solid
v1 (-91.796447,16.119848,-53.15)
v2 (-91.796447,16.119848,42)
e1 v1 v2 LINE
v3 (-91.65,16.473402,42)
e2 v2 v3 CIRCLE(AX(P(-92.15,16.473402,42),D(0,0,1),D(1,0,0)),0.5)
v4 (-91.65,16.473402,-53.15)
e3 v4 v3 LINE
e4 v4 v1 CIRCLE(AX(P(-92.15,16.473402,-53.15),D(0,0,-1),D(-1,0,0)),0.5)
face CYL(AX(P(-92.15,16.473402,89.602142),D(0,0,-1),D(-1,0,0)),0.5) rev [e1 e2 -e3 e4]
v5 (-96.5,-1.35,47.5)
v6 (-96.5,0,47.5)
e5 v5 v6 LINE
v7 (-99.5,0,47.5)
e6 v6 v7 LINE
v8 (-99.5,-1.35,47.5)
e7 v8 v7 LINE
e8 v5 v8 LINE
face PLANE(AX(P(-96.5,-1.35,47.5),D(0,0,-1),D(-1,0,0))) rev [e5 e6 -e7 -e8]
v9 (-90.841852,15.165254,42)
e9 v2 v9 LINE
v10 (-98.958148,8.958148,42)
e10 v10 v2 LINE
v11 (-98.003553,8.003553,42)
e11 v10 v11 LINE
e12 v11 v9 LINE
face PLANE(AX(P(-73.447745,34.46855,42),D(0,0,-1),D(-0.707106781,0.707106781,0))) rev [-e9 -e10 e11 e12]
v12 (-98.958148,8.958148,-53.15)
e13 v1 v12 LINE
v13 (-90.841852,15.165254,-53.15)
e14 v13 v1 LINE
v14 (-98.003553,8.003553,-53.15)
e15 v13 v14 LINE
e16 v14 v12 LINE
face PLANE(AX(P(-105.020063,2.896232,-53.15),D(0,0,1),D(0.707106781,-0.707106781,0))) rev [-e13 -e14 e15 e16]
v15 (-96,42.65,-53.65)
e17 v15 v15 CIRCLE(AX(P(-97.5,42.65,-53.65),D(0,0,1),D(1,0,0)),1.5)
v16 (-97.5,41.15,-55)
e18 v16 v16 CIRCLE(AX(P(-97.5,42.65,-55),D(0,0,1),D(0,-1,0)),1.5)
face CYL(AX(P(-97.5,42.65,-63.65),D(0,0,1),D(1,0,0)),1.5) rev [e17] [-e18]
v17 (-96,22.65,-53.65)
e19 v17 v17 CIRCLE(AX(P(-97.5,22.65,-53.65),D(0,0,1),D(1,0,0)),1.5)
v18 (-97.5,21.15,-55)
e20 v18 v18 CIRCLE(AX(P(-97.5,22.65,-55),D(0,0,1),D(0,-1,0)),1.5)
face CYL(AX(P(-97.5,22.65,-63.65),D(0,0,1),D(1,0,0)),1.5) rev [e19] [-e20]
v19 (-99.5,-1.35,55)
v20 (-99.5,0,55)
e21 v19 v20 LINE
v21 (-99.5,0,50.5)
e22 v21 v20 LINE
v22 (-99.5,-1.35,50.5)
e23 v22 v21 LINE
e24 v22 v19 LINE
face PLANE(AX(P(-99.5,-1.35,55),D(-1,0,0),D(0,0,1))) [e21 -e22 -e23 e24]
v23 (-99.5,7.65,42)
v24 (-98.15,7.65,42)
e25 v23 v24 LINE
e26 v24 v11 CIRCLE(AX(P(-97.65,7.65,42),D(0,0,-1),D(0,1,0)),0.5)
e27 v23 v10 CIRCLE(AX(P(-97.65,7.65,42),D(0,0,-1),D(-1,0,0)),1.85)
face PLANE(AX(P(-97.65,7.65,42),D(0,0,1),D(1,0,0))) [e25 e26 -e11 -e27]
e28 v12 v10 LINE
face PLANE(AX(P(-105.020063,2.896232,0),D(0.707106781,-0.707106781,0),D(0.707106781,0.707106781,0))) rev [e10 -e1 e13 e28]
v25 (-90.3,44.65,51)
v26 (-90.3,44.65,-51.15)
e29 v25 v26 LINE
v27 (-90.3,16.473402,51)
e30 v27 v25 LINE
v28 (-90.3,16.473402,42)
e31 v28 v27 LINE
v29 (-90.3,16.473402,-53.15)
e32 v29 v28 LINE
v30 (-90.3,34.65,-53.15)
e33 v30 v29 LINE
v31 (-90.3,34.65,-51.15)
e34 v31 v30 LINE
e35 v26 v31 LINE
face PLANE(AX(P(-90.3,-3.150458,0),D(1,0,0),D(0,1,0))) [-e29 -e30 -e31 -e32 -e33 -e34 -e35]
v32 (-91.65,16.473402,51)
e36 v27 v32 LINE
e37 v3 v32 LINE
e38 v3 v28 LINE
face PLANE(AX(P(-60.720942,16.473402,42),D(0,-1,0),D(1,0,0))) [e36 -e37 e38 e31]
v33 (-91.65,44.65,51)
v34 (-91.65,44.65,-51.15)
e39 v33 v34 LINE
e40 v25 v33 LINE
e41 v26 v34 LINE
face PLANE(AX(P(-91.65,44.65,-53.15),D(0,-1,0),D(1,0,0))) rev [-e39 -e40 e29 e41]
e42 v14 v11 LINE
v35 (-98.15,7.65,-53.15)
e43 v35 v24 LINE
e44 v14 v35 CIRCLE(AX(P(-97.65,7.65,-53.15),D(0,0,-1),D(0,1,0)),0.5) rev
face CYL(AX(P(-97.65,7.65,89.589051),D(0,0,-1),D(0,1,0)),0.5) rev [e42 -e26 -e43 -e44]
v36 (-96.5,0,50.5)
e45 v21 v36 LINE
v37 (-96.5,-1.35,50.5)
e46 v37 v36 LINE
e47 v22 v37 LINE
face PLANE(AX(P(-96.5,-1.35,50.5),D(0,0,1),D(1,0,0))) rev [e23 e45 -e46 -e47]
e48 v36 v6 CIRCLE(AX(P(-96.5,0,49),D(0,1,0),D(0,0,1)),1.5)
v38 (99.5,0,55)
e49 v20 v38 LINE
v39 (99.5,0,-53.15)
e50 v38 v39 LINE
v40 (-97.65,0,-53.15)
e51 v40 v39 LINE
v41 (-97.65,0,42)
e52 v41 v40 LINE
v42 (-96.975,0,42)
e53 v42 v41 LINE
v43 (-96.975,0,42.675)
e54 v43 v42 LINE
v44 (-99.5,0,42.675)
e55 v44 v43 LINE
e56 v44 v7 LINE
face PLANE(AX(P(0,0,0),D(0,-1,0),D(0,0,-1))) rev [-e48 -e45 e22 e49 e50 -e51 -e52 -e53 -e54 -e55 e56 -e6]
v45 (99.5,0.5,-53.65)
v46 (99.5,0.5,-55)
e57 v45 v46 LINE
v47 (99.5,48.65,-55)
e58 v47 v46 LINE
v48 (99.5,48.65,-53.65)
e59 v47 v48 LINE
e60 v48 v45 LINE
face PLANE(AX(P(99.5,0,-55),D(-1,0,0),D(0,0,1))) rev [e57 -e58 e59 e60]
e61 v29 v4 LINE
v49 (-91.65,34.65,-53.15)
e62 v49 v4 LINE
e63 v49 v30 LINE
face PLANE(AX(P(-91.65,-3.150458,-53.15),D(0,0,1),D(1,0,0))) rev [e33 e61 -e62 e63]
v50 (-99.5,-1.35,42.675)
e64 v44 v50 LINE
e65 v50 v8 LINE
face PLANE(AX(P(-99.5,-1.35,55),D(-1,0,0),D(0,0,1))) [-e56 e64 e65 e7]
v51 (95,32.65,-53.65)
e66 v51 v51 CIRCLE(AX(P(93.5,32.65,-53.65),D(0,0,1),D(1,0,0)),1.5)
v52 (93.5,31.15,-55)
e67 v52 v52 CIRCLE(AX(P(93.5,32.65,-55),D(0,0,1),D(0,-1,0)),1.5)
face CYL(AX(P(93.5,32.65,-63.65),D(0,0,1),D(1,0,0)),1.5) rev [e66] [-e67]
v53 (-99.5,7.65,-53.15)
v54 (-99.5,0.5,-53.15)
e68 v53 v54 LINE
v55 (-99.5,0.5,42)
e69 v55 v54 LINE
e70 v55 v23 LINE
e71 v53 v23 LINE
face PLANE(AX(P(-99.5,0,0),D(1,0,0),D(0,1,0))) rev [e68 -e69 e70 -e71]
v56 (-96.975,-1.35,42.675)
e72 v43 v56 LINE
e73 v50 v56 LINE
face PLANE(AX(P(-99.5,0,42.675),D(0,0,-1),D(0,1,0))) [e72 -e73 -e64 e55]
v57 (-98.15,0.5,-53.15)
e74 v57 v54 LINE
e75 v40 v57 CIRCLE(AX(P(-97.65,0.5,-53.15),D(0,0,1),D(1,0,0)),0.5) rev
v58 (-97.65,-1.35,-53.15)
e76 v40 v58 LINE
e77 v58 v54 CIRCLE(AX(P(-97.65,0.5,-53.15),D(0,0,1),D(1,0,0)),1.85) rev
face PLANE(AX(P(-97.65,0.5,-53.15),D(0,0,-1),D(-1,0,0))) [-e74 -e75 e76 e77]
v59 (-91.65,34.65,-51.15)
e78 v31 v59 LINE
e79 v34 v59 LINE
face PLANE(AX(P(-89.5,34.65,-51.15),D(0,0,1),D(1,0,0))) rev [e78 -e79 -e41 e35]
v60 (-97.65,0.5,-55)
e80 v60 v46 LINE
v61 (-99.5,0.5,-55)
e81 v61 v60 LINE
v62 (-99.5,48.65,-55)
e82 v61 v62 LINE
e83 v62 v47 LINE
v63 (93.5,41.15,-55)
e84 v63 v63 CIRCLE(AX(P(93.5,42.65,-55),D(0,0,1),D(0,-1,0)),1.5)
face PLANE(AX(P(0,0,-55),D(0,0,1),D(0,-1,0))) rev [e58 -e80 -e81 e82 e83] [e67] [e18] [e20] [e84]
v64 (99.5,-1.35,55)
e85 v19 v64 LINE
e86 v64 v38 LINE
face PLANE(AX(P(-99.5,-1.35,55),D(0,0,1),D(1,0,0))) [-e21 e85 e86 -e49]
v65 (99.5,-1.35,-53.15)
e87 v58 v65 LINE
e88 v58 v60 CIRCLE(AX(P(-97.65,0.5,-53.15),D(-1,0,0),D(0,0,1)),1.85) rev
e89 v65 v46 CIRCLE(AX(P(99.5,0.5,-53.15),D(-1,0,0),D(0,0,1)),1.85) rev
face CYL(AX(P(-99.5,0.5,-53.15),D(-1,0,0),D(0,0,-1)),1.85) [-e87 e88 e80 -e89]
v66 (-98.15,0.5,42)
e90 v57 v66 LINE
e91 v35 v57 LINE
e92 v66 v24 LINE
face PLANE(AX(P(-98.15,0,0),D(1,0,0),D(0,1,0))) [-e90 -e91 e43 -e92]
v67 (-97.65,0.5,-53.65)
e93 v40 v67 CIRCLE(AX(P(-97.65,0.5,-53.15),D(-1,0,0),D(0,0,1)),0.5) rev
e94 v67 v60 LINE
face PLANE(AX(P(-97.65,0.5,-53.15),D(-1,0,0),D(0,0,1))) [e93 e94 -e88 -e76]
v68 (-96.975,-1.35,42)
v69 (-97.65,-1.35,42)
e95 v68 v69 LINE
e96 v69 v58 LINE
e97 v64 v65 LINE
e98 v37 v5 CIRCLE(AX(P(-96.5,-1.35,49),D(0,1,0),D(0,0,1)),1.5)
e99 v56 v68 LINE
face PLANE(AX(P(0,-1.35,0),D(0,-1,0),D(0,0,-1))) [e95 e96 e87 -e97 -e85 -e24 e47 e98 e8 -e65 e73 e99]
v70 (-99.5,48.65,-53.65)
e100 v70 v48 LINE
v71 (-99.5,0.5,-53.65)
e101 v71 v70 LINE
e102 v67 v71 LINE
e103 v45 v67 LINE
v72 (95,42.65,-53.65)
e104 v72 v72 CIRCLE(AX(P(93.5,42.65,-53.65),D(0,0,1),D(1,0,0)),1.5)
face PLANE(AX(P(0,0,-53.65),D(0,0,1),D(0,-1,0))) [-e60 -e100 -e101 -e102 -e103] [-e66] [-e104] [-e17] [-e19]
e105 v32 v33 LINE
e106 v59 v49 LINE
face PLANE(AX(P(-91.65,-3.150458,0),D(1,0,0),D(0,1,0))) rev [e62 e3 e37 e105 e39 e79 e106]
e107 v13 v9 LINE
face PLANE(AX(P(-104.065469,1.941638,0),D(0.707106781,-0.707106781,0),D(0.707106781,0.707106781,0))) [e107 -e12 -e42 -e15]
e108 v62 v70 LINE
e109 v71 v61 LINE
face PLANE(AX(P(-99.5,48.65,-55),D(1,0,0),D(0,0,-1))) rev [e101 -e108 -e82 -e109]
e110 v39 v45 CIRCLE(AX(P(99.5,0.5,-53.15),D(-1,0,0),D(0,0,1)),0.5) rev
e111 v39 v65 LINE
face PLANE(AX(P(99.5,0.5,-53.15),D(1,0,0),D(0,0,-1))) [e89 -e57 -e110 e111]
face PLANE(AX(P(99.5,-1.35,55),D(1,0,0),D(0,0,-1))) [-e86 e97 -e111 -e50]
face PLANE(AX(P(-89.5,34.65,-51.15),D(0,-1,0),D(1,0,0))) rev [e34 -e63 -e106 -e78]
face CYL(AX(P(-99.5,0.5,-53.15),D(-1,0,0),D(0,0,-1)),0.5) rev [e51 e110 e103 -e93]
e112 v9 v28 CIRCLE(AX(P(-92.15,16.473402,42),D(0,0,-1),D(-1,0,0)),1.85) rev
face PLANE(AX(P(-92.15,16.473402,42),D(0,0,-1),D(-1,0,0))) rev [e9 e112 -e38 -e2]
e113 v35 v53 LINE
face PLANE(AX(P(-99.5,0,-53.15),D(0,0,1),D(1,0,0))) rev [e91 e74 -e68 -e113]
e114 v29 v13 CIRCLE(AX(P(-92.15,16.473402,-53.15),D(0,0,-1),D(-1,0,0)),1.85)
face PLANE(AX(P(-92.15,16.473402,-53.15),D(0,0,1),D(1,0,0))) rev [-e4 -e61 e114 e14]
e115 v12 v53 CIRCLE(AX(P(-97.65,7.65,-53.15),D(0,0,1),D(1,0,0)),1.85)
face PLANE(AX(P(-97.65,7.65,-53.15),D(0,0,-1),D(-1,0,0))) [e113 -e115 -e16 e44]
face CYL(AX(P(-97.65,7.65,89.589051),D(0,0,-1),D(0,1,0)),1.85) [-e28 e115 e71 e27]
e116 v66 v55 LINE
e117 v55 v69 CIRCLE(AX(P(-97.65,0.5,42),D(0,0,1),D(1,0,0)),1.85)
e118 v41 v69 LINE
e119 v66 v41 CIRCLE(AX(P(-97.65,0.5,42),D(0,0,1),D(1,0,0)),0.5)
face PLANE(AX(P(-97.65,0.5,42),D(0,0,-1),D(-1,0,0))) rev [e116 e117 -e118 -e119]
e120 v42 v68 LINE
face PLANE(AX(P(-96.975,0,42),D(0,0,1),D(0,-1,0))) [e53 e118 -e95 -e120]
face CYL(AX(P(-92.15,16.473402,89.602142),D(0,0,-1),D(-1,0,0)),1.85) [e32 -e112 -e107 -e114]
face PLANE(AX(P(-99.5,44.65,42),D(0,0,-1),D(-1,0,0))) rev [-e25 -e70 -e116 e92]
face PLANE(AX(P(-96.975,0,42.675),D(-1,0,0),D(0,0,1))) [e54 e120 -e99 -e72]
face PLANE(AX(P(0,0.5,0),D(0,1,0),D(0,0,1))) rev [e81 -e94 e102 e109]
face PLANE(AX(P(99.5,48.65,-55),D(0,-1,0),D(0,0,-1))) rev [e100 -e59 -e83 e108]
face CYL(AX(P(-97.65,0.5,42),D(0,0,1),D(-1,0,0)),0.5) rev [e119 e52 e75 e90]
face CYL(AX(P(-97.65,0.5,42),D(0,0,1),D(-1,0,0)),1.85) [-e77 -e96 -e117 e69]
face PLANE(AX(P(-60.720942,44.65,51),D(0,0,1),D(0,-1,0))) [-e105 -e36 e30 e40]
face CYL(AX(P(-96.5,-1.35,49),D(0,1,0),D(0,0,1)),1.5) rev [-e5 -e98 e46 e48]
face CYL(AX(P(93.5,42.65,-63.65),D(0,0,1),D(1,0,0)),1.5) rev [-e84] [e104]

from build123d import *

# Parameters (mm, degrees)
SKETCH1_W                    = 199
SKETCH1_H                    = 110
BASE_FLANGE1_DEPTH           = 1.35
EDGE_FLANGE1_STRIP_W         = 6.4
EDGE_FLANGE1_STRIP_H         = 1.35
EDGE_FLANGE1_STRIP_CUT_DEPTH = 199
EDGE_FLANGE1_DEPTH           = 199
EDGE_FLANGE2_START           = -55
EDGE_FLANGE2_DEPTH           = 97.675
EDGE_FLANGE2_2_DEPTH         = 1.85
EDGE_FLANGE2_START_2         = 42
EDGE_FLANGE2_3_DEPTH         = 0.675
EDGE_FLANGE2_START_3         = -53.15
EDGE_FLANGE2_4_DEPTH         = 95.15
JOG1_START                   = -53.15
JOG1_DEPTH                   = 95.15
JOG1_2_DEPTH                 = 95.15
SKETCH13_W                   = 2
SKETCH13_H                   = 10
CUT_EXTRUDE1_DEPTH           = 10
SKETCH15_R                   = 1.5
CUT_EXTRUDE2_DEPTH           = 10
SKETCH31_W                   = 9
SKETCH31_H                   = 28.176598128
BOSS_EXTRUDE2_DEPTH          = 1.35
CUT_EXTRUDE3_DEPTH           = 124.661119597


# Read off the part's stored shape, not the designer's step: Edge-Flange2, Jog1
# Sheet-metal steps are written as plain solids
with BuildPart() as part:
    # Sketch1 → Base-Flange1 (new body)
    with BuildSketch(Plane(origin=(0, 0, 0), x_dir=(1, 0, 0), z_dir=(0, 1, 0))):
        Rectangle(SKETCH1_W, SKETCH1_H)
    extrude(amount=-BASE_FLANGE1_DEPTH)

    # Edge-Flange1 strip (across the edge) → Edge-Flange1 strip cut (cut)
    with BuildSketch(Plane(origin=(99.5, 0, -55), x_dir=(0, 0, 1), z_dir=(-1, 0, 0))):
        with Locations((-1.35, -0.675)):
            Rectangle(EDGE_FLANGE1_STRIP_W, EDGE_FLANGE1_STRIP_H)
    extrude(amount=EDGE_FLANGE1_STRIP_CUT_DEPTH, mode=Mode.SUBTRACT)

    # Edge-Flange1 section (across the edge) → Edge-Flange1 (add)
    with BuildSketch(Plane(origin=(99.5, 0, -55), x_dir=(0, 0, 1), z_dir=(-1, 0, 0))):
        with BuildLine():
            Line((0, 0.5), (0, 48.65))
            Line((0, 48.65), (1.35, 48.65))
            Line((1.35, 48.65), (1.35, 0.5))
            ThreePointArc((1.35, 0.5), (1.496446609, 0.146446609), (1.85, 0))
            Line((1.85, 0), (1.85, -1.35))
            ThreePointArc((1.85, -1.35), (0.541852455, -0.808147545), (0, 0.5))
        make_face()
    extrude(amount=EDGE_FLANGE1_DEPTH)

    # Edge-Flange2 outline → Edge-Flange2 (cut)
    with BuildSketch(Plane.XY.offset(EDGE_FLANGE2_START)):
        with BuildLine():
            Line((-97.65, 0), (-97.65, 0.5))
            Line((-97.65, 0.5), (-98.15, 0.5))
            ThreePointArc((-98.15, 0.5), (-98.003553391, 0.146446609), (-97.65, 0))
        make_face()
        with BuildLine():
            Line((-99.5, 0.5), (-99.5, -1.35))
            Line((-99.5, -1.35), (-97.65, -1.35))
            ThreePointArc((-97.65, -1.35), (-98.958147545, -0.808147545), (-99.5, 0.5))
        make_face()
    extrude(amount=EDGE_FLANGE2_DEPTH, mode=Mode.SUBTRACT)

    # Edge-Flange2 2 outline → Edge-Flange2 2 (cut)
    with BuildSketch(Plane.XY.offset(EDGE_FLANGE2_START)):
        with BuildLine():
            ThreePointArc((-97.65, 0), (-98.003553391, 0.146446609), (-98.15, 0.5))
            Line((-98.15, 0.5), (-99.5, 0.5))
            ThreePointArc((-99.5, 0.5), (-98.958147545, -0.808147545), (-97.65, -1.35))
            Line((-97.65, -1.35), (-97.65, 0))
        make_face()
    extrude(amount=EDGE_FLANGE2_2_DEPTH, mode=Mode.SUBTRACT)

    # Edge-Flange2 3 outline → Edge-Flange2 3 (cut)
    with BuildSketch(Plane.XY.offset(EDGE_FLANGE2_START_2)):
        with BuildLine():
            Line((-96.975, 0), (-99.431151313, 0))
            ThreePointArc((-99.431151313, 0), (-98.767474832, -0.97436427), (-97.65, -1.35))
            Line((-97.65, -1.35), (-96.975, -1.35))
            Line((-96.975, -1.35), (-96.975, 0))
        make_face()
    extrude(amount=EDGE_FLANGE2_3_DEPTH, mode=Mode.SUBTRACT)

    # Edge-Flange2 4 outline → Edge-Flange2 4 (add)
    with BuildSketch(Plane.XY.offset(EDGE_FLANGE2_START_3)):
        with BuildLine():
            ThreePointArc((-97.65, 0), (-98.003553391, 0.146446609), (-98.15, 0.5))
            Line((-98.15, 0.5), (-98.15, 44.65))
            Line((-98.15, 44.65), (-99.5, 44.65))
            Line((-99.5, 44.65), (-99.5, 0.5))
            ThreePointArc((-99.5, 0.5), (-99.482707004, 0.247641058), (-99.431151313, 0))
            Line((-99.431151313, 0), (-97.65, 0))
        make_face()
    extrude(amount=EDGE_FLANGE2_4_DEPTH)

    # Jog1 outline → Jog1 (cut)
    with BuildSketch(Plane.XY.offset(JOG1_START)):
        with BuildLine():
            Line((-99.5, 44.65), (-99.5, 7.65))
            ThreePointArc((-99.5, 7.65), (-99.359177135, 8.35796435), (-98.958147545, 8.958147545))
            Line((-98.958147545, 8.958147545), (-98.15, 9.76629509))
            Line((-98.15, 9.76629509), (-98.15, 44.65))
            Line((-98.15, 44.65), (-99.5, 44.65))
        make_face()
    extrude(amount=JOG1_DEPTH, mode=Mode.SUBTRACT)

    # Jog1 2 outline → Jog1 2 (add)
    with BuildSketch(Plane.XY.offset(JOG1_START)):
        with BuildLine():
            Line((-91.796446609, 16.119848481), (-98.15, 9.76629509))
            Line((-98.15, 9.76629509), (-98.15, 7.65))
            ThreePointArc((-98.15, 7.65), (-98.111939766, 7.841341716), (-98.003553391, 8.003553391))
            Line((-98.003553391, 8.003553391), (-90.841852455, 15.165254326))
            ThreePointArc((-90.841852455, 15.165254326), (-90.440822865, 15.765437522), (-90.3, 16.473401872))
            Line((-90.3, 16.473401872), (-90.3, 44.65))
            Line((-90.3, 44.65), (-91.65, 44.65))
            Line((-91.65, 44.65), (-91.65, 16.473401872))
            ThreePointArc((-91.65, 16.473401872), (-91.688060234, 16.282060156), (-91.796446609, 16.119848481))
        make_face()
    extrude(amount=JOG1_2_DEPTH)

    # Sketch13 → Cut-Extrude1 (cut)
    with BuildSketch(Plane.ZY.offset(99.5)):
        with Locations((-52.15, 39.65)):
            Rectangle(SKETCH13_W, SKETCH13_H)
    extrude(amount=-CUT_EXTRUDE1_DEPTH, mode=Mode.SUBTRACT)

    # Sketch15 → Cut-Extrude2 (cut)
    with BuildSketch(Plane.XY.offset(-53.65)):
        with Locations((-97.5, 42.65)):
            Circle(SKETCH15_R)
        with Locations((-97.5, 22.65)):
            Circle(SKETCH15_R)
        with Locations((93.5, 42.65)):
            Circle(SKETCH15_R)
        with Locations((93.5, 32.65)):
            Circle(SKETCH15_R)
    extrude(amount=-CUT_EXTRUDE2_DEPTH, mode=Mode.SUBTRACT)

    # Sketch31 → Boss-Extrude2 (add)
    with BuildSketch(Plane.ZY.offset(91.65)):
        with Locations((46.5, 30.561700936)):
            Rectangle(SKETCH31_W, SKETCH31_H)
    extrude(amount=-BOSS_EXTRUDE2_DEPTH)

    # Sketch16 → Cut-Extrude3 (cut, through all)
    with BuildSketch(Plane(origin=(0, 0, 0), x_dir=(1, 0, 0), z_dir=(0, 1, 0))):
        with BuildLine():
            Line((-96.5, -47.5), (-99.5, -47.5))
            Line((-99.5, -47.5), (-99.5, -50.5))
            Line((-99.5, -50.5), (-96.5, -50.5))
            ThreePointArc((-96.5, -50.5), (-95, -49), (-96.5, -47.5))
        make_face()
    extrude(amount=-CUT_EXTRUDE3_DEPTH, mode=Mode.SUBTRACT)


solid = part.part
